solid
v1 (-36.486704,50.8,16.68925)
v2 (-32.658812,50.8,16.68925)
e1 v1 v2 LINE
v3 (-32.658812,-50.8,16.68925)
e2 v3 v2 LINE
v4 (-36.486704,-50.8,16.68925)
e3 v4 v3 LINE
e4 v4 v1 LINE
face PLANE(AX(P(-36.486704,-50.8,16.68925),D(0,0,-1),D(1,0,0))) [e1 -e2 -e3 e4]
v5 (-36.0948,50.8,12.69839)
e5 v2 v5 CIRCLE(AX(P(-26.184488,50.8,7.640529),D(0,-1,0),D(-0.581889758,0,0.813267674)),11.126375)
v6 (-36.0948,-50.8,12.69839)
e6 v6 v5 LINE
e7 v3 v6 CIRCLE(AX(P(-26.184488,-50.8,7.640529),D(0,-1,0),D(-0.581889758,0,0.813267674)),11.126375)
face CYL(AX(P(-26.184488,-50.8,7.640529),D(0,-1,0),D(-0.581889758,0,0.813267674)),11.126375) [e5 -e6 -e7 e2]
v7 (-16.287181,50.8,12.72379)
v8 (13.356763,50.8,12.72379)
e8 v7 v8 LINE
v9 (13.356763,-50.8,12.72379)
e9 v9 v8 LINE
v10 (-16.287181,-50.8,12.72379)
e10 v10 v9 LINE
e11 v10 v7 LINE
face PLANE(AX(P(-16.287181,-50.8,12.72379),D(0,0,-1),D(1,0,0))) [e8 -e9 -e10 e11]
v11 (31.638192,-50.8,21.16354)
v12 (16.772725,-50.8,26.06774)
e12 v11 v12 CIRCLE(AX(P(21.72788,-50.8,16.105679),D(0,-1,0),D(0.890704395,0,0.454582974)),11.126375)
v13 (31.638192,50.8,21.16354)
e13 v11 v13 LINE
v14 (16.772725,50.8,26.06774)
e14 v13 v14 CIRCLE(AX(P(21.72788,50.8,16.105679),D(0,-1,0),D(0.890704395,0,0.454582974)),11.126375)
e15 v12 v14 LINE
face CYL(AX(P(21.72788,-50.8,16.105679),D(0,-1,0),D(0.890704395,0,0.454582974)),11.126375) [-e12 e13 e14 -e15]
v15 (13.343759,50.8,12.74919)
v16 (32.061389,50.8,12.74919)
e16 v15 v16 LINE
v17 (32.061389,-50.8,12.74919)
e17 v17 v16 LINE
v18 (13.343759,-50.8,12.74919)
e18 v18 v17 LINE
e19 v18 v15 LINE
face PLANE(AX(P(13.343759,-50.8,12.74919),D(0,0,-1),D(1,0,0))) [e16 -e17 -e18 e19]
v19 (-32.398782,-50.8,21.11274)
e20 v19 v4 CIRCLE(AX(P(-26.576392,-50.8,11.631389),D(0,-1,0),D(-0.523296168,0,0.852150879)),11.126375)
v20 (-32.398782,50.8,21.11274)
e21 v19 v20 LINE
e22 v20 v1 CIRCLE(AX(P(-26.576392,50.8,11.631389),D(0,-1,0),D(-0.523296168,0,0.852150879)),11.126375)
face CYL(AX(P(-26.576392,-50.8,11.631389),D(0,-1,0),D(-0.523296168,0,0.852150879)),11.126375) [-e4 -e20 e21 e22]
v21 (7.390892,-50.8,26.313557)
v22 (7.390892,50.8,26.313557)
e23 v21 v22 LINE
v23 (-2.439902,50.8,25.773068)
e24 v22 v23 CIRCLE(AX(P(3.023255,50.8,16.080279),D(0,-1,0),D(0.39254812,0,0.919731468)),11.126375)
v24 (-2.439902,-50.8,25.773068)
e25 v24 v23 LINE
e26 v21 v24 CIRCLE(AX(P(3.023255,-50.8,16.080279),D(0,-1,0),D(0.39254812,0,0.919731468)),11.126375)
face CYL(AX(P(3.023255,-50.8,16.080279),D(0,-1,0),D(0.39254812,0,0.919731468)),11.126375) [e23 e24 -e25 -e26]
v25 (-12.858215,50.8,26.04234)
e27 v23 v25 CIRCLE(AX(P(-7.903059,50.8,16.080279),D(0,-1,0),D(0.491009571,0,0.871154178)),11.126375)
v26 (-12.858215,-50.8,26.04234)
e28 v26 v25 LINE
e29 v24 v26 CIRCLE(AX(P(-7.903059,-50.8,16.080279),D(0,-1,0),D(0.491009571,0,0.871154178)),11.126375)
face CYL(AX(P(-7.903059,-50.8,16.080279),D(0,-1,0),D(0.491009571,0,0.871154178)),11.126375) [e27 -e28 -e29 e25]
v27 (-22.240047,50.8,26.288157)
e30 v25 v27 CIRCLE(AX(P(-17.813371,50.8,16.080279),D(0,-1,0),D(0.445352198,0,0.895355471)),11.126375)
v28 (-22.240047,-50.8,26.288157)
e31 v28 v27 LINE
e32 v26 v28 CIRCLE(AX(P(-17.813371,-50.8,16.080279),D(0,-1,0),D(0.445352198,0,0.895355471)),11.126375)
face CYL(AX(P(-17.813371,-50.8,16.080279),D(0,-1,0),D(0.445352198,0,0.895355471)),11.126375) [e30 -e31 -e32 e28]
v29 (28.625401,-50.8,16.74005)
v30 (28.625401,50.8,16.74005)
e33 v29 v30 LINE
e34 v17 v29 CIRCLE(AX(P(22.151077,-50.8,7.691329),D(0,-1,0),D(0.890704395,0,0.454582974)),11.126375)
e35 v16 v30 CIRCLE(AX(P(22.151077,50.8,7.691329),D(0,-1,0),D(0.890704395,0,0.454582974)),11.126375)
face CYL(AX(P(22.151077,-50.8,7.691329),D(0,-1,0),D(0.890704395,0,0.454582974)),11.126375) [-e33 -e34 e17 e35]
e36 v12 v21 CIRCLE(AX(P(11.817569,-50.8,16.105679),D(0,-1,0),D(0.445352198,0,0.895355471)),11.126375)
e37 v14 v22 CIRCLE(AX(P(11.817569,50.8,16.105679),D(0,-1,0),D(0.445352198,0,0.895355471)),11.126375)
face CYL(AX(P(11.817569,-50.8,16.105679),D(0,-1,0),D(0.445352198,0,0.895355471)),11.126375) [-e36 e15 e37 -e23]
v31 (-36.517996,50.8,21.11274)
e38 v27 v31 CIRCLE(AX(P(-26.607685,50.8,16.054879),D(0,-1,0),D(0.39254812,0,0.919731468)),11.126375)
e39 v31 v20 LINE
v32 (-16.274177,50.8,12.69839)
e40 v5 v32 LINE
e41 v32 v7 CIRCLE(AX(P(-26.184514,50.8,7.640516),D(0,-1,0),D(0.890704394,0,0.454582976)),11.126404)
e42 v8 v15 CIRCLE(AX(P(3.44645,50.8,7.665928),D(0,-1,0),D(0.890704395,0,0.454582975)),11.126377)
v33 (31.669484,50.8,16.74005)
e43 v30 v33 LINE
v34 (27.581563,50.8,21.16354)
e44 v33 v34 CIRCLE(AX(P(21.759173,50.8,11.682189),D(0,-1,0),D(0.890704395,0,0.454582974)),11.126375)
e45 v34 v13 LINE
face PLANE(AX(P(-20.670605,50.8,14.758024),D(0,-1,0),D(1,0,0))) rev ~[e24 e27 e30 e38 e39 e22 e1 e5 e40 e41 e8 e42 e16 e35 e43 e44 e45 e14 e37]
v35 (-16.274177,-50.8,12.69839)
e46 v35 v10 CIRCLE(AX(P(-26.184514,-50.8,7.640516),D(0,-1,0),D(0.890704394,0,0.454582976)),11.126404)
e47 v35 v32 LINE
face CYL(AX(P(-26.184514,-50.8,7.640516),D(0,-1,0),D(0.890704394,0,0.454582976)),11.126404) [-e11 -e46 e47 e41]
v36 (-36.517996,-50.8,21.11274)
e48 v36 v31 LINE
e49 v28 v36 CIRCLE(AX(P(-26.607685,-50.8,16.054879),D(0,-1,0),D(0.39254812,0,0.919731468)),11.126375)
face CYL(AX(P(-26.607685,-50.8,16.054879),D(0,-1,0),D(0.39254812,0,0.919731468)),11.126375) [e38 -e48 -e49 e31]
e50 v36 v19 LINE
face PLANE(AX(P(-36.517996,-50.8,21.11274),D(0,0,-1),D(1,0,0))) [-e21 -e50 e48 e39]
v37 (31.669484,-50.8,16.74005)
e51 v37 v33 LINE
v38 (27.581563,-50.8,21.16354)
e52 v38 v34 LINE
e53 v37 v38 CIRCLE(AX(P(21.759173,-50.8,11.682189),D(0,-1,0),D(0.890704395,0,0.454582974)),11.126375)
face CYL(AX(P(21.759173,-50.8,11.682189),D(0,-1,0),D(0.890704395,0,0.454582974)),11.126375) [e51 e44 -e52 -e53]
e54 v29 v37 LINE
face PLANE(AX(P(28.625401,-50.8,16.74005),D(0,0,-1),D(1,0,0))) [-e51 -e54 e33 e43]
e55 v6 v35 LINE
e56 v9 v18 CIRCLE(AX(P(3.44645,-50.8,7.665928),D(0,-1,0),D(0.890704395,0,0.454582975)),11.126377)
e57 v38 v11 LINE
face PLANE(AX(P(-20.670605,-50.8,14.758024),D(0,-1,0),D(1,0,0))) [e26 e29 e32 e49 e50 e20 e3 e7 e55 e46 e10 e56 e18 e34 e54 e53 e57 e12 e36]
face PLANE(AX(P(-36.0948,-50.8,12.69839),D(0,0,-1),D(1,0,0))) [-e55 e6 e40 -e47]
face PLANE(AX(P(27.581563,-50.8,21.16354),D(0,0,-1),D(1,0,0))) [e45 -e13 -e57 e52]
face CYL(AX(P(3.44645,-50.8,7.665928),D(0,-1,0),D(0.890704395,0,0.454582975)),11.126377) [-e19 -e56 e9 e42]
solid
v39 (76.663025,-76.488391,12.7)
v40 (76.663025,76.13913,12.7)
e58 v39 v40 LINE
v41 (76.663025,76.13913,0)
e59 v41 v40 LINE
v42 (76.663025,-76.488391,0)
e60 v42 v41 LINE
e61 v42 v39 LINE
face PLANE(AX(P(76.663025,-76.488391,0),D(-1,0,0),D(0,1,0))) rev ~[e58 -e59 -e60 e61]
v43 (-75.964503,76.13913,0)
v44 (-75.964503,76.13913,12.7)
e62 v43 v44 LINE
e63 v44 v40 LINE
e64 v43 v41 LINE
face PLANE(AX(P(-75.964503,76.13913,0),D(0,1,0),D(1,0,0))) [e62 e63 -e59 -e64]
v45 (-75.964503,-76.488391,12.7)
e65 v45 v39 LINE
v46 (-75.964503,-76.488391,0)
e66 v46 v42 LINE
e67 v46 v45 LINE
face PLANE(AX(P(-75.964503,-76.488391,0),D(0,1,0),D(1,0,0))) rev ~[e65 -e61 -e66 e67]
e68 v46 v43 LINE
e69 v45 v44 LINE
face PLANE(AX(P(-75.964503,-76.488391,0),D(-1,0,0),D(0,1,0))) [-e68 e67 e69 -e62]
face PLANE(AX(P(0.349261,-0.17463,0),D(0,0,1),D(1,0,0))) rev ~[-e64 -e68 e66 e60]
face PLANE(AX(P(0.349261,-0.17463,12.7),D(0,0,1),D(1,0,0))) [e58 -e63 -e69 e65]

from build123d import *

# Parameters (mm, degrees)
F0_W     = 152.6275277138
F0_H     = 152.6275202632
F1_DEPTH = 12.7
F4_DEPTH = 101.6


with BuildPart() as f1:
    # F0 (on Top) → F1 (new body)
    with BuildSketch(Plane.XY):
        with Locations((0.3492608666, -0.1746304333)):
            Rectangle(F0_W, F0_H)
    extrude(amount=F1_DEPTH)


with BuildPart() as f4:
    # F3 (on offset) → F4 (new body)
    with BuildSketch(Plane.XZ.offset(50.8)):
        with BuildLine():
            ThreePointArc((-23.899851243, 16.6892502457), (-25.8361923758, 14.9089254969), (-27.3004854098, 12.7237895504))
            Line((-27.3004854098, 12.7237895504), (-17.3901738599, 12.7237895504))
            ThreePointArc((-17.3901738599, 12.7237895504), (-15.911695575, 14.925434135), (-13.9541862477, 16.7146502063))
            Line((-13.9541862477, 16.7146502063), (-16.6790850963, 16.7146502063))
            ThreePointArc((-16.6790850963, 16.7146502063), (-16.6725748067, 16.7019543949), (-16.6660808027, 16.6892502457))
            Line((-16.6660808027, 16.6892502457), (-19.7101641502, 16.6892502457))
            Line((-19.7101641502, 16.6892502457), (-23.899851243, 16.6892502457))
        make_face()
        with BuildLine():
            Line((-17.3901738599, 12.7237895504), (-27.3004854098, 12.7237895504))
            ThreePointArc((-27.3004854098, 12.7237895504), (-25.8361923758, 14.9089254969), (-23.899851243, 16.6892502457))
            Line((-23.899851243, 16.6892502457), (-32.6588120256, 16.6892502457))
            ThreePointArc((-32.6588120256, 16.6892502457), (-34.6163213529, 14.9000341745), (-36.0947996378, 12.6983895898))
            Line((-36.0947996378, 12.6983895898), (-16.274176538, 12.6983895898))
            ThreePointArc((-16.274176538, 12.6983895898), (-16.280670542, 12.711093739), (-16.2871808316, 12.7237895504))
            Line((-16.2871808316, 12.7237895504), (-17.3901738599, 12.7237895504))
        make_face()
        with BuildLine():
            ThreePointArc((-13.9541862477, 16.7146502063), (-15.911695575, 14.925434135), (-17.3901738599, 12.7237895504))
            Line((-17.3901738599, 12.7237895504), (-16.2871808316, 12.7237895504))
            Line((-16.2871808316, 12.7237895504), (-7.47986231, 12.7237895504))
            Line((-7.47986231, 12.7237895504), (-6.4638601616, 12.7237895504))
            ThreePointArc((-6.4638601616, 12.7237895504), (-4.9853818767, 14.925434135), (-3.0278725494, 16.7146502063))
            Line((-3.0278725494, 16.7146502063), (-6.8557644263, 16.7146502063))
            Line((-6.8557644263, 16.7146502063), (-7.8717665747, 16.7146502063))
            Line((-7.8717665747, 16.7146502063), (-13.9541862477, 16.7146502063))
        make_face()
        with BuildLine():
            ThreePointArc((-23.8644977976, 16.7146502063), (-23.8821869424, 16.701967516), (-23.899851243, 16.6892502457))
            Line((-23.899851243, 16.6892502457), (-19.7101641502, 16.6892502457))
            ThreePointArc((-19.7101641502, 16.6892502457), (-19.7279755385, 16.7019677558), (-19.7458119078, 16.7146502063))
            Line((-19.7458119078, 16.7146502063), (-23.8644977976, 16.7146502063))
        make_face()
        with BuildLine():
            Line((-32.6588120256, 16.6892502457), (-23.899851243, 16.6892502457))
            ThreePointArc((-23.899851243, 16.6892502457), (-23.8821869424, 16.701967516), (-23.8644977976, 16.7146502063))
            Line((-23.8644977976, 16.7146502063), (-27.6923896745, 16.7146502063))
            ThreePointArc((-27.6923896745, 16.7146502063), (-25.9698422833, 19.1904969058), (-23.6456289265, 21.1127400398))
            Line((-23.6456289265, 21.1127400398), (-32.3987820079, 21.1127400398))
            ThreePointArc((-32.3987820079, 21.1127400398), (-34.7477623291, 19.1828756115), (-36.4867039025, 16.6892502457))
            Line((-36.4867039025, 16.6892502457), (-32.6588120256, 16.6892502457))
        make_face()
        with BuildLine():
            Line((-16.6790850963, 16.7146502063), (-13.9541862477, 16.7146502063))
            Line((-13.9541862477, 16.7146502063), (-7.8717665747, 16.7146502063))
            Line((-7.8717665747, 16.7146502063), (-6.8557644263, 16.7146502063))
            ThreePointArc((-6.8557644263, 16.7146502063), (-5.1168228529, 19.2082755721), (-2.7678425317, 21.1381400004))
            Line((-2.7678425317, 21.1381400004), (-6.8870568648, 21.1381400004))
            Line((-6.8870568648, 21.1381400004), (-7.9030590132, 21.1381400004))
            Line((-7.9030590132, 21.1381400004), (-13.69415623, 21.1381400004))
            ThreePointArc((-13.69415623, 21.1381400004), (-16.0431365512, 19.2082755721), (-17.7820781246, 16.7146502063))
            Line((-17.7820781246, 16.7146502063), (-16.6790850963, 16.7146502063))
        make_face()
        with BuildLine():
            ThreePointArc((-19.7458119078, 16.7146502063), (-19.7279755385, 16.7019677558), (-19.7101641502, 16.6892502457))
            Line((-19.7101641502, 16.6892502457), (-16.6660808027, 16.6892502457))
            ThreePointArc((-16.6660808027, 16.6892502457), (-16.6725748067, 16.7019543949), (-16.6790850963, 16.7146502063))
            Line((-16.6790850963, 16.7146502063), (-17.7820781246, 16.7146502063))
            Line((-17.7820781246, 16.7146502063), (-19.7458119078, 16.7146502063))
        make_face()
        with BuildLine():
            Line((-27.6923896745, 16.7146502063), (-23.8644977976, 16.7146502063))
            Line((-23.8644977976, 16.7146502063), (-19.7458119078, 16.7146502063))
            Line((-19.7458119078, 16.7146502063), (-17.7820781246, 16.7146502063))
            ThreePointArc((-17.7820781246, 16.7146502063), (-16.0431365512, 19.2082755721), (-13.69415623, 21.1381400004))
            Line((-13.69415623, 21.1381400004), (-16.7103775348, 21.1381400004))
            ThreePointArc((-16.7103775348, 21.1381400004), (-16.7038672452, 21.1254441891), (-16.6973732412, 21.1127400398))
            Line((-16.6973732412, 21.1127400398), (-20.7540026972, 21.1127400398))
            Line((-20.7540026972, 21.1127400398), (-23.6456289265, 21.1127400398))
            ThreePointArc((-23.6456289265, 21.1127400398), (-25.9698422833, 19.1904969058), (-27.6923896745, 16.7146502063))
        make_face()
        with BuildLine():
            ThreePointArc((-3.0278725494, 16.7146502063), (-4.9853818767, 14.925434135), (-6.4638601616, 12.7237895504))
            Line((-6.4638601616, 12.7237895504), (2.4304492399, 12.7237895504))
            Line((2.4304492399, 12.7237895504), (13.3567629382, 12.7237895504))
            ThreePointArc((13.3567629382, 12.7237895504), (13.3502689342, 12.7364936996), (13.3437586446, 12.7491895109))
            Line((13.3437586446, 12.7491895109), (12.2407656163, 12.7491895109))
            Line((12.2407656163, 12.7491895109), (2.3304540664, 12.7491895109))
            ThreePointArc((2.3304540664, 12.7491895109), (3.7947471004, 14.9343254574), (5.7310882332, 16.7146502063))
            Line((5.7310882332, 16.7146502063), (2.0385449752, 16.7146502063))
            Line((2.0385449752, 16.7146502063), (-3.0278725494, 16.7146502063))
        make_face()
        with BuildLine():
            ThreePointArc((-2.7678425317, 21.1381400004), (-5.1168228529, 19.2082755721), (-6.8557644263, 16.7146502063))
            Line((-6.8557644263, 16.7146502063), (-3.0278725494, 16.7146502063))
            Line((-3.0278725494, 16.7146502063), (2.0385449752, 16.7146502063))
            ThreePointArc((2.0385449752, 16.7146502063), (2.0320509712, 16.7273543555), (2.0255406816, 16.7400501668))
            Line((2.0255406816, 16.7400501668), (1.9385498017, 16.7400501668))
            ThreePointArc((1.9385498017, 16.7400501668), (1.9601396942, 16.7821320004), (1.9819082764, 16.8241216778))
            ThreePointArc((1.9819082764, 16.8241216778), (3.6931960459, 19.2506339908), (5.9853105497, 21.1381400004))
            Line((5.9853105497, 21.1381400004), (2.0072525367, 21.1381400004))
            Line((2.0072525367, 21.1381400004), (-2.7678425317, 21.1381400004))
        make_face()
        with BuildLine():
            Line((-36.517996341, 21.1127400398), (-32.3987820079, 21.1127400398))
            Line((-32.3987820079, 21.1127400398), (-23.6456289265, 21.1127400398))
            ThreePointArc((-23.6456289265, 21.1127400398), (-23.6250621552, 21.1254623865), (-23.6044677799, 21.1381400004))
            Line((-23.6044677799, 21.1381400004), (-27.723682113, 21.1381400004))
            ThreePointArc((-27.723682113, 21.1381400004), (-25.4303236651, 24.190658722), (-22.2400470078, 26.2881568427))
            ThreePointArc((-22.2400470078, 26.2881568427), (-30.3993259782, 26.515265819), (-36.517996341, 21.1127400398))
        make_face()
        with BuildLine():
            ThreePointArc((-23.6044677799, 21.1381400004), (-23.6250621552, 21.1254623865), (-23.6456289265, 21.1127400398))
            Line((-23.6456289265, 21.1127400398), (-20.7540026972, 21.1127400398))
            ThreePointArc((-20.7540026972, 21.1127400398), (-20.7747717042, 21.1254627675), (-20.7955685121, 21.1381400004))
            Line((-20.7955685121, 21.1381400004), (-23.6044677799, 21.1381400004))
        make_face()
        with BuildLine():
            Line((-16.7103775348, 21.1381400004), (-13.69415623, 21.1381400004))
            Line((-13.69415623, 21.1381400004), (-7.9030590132, 21.1381400004))
            Line((-7.9030590132, 21.1381400004), (-6.8870568648, 21.1381400004))
            ThreePointArc((-6.8870568648, 21.1381400004), (-5.0052271885, 23.7835064069), (-2.439902164, 25.7730676333))
            ThreePointArc((-2.439902164, 25.7730676333), (-7.6155816808, 27.2029401673), (-12.8582147881, 26.0423403114))
            ThreePointArc((-12.8582147881, 26.0423403114), (-15.7298287727, 23.9883703542), (-17.8133705631, 21.1381400004))
            Line((-17.8133705631, 21.1381400004), (-16.7103775348, 21.1381400004))
        make_face()
        with BuildLine():
            Line((-6.8870568648, 21.1381400004), (-2.7678425317, 21.1381400004))
            Line((-2.7678425317, 21.1381400004), (2.0072525367, 21.1381400004))
            ThreePointArc((2.0072525367, 21.1381400004), (2.0007585327, 21.1508441496), (1.9942482431, 21.163539961))
            Line((1.9942482431, 21.163539961), (1.9072573632, 21.163539961))
            ThreePointArc((1.9072573632, 21.163539961), (1.9288472557, 21.2056217946), (1.9506158379, 21.247611472))
            ThreePointArc((1.9506158379, 21.247611472), (4.2351608696, 24.2483641482), (7.3908924684, 26.3135568032))
            ThreePointArc((7.3908924684, 26.3135568032), (2.4124579582, 27.1898767431), (-2.439902164, 25.7730676333))
            ThreePointArc((-2.439902164, 25.7730676333), (-5.0052271885, 23.7835064069), (-6.8870568648, 21.1381400004))
        make_face()
        with BuildLine():
            ThreePointArc((-20.7955685121, 21.1381400004), (-20.7747717042, 21.1254627675), (-20.7540026972, 21.1127400398))
            Line((-20.7540026972, 21.1127400398), (-16.6973732412, 21.1127400398))
            ThreePointArc((-16.6973732412, 21.1127400398), (-16.7038672452, 21.1254441891), (-16.7103775348, 21.1381400004))
            Line((-16.7103775348, 21.1381400004), (-17.8133705631, 21.1381400004))
            Line((-17.8133705631, 21.1381400004), (-20.7955685121, 21.1381400004))
        make_face()
        with BuildLine():
            Line((-27.723682113, 21.1381400004), (-23.6044677799, 21.1381400004))
            Line((-23.6044677799, 21.1381400004), (-20.7955685121, 21.1381400004))
            Line((-20.7955685121, 21.1381400004), (-17.8133705631, 21.1381400004))
            ThreePointArc((-17.8133705631, 21.1381400004), (-15.7298287727, 23.9883703542), (-12.8582147881, 26.0423403114))
            ThreePointArc((-12.8582147881, 26.0423403114), (-17.5219446851, 27.2028374115), (-22.2400470078, 26.2881568427))
            ThreePointArc((-22.2400470078, 26.2881568427), (-25.4303236651, 24.190658722), (-27.723682113, 21.1381400004))
        make_face()
        with BuildLine():
            ThreePointArc((2.0255406816, 16.7400501668), (2.0320509712, 16.7273543555), (2.0385449752, 16.7146502063))
            Line((2.0385449752, 16.7146502063), (5.7310882332, 16.7146502063))
            ThreePointArc((5.7310882332, 16.7146502063), (5.7487525338, 16.7273674766), (5.7664416786, 16.7400501668))
            Line((5.7664416786, 16.7400501668), (2.0255406816, 16.7400501668))
        make_face()
        with BuildLine():
            ThreePointArc((1.9942482431, 21.163539961), (2.0007585327, 21.1508441496), (2.0072525367, 21.1381400004))
            Line((2.0072525367, 21.1381400004), (5.9853105497, 21.1381400004))
            ThreePointArc((5.9853105497, 21.1381400004), (6.005877321, 21.1508623471), (6.0264716963, 21.163539961))
            Line((6.0264716963, 21.163539961), (1.9942482431, 21.163539961))
        make_face()
        with BuildLine():
            Line((12.2407656163, 12.7491895109), (13.3437586446, 12.7491895109))
            Line((13.3437586446, 12.7491895109), (22.1510771662, 12.7491895109))
            Line((22.1510771662, 12.7491895109), (32.0613887161, 12.7491895109))
            ThreePointArc((32.0613887161, 12.7491895109), (30.5829104312, 14.9508340956), (28.6254011039, 16.7400501668))
            Line((28.6254011039, 16.7400501668), (21.7591729015, 16.7400501668))
            Line((21.7591729015, 16.7400501668), (15.6767532285, 16.7400501668))
            ThreePointArc((15.6767532285, 16.7400501668), (13.7192439012, 14.9508340956), (12.2407656163, 12.7491895109))
        make_face()
        with BuildLine():
            Line((1.9385498017, 16.7400501668), (2.0255406816, 16.7400501668))
            ThreePointArc((2.0255406816, 16.7400501668), (2.0038139428, 16.7821323533), (1.9819082764, 16.8241216778))
            ThreePointArc((1.9819082764, 16.8241216778), (1.9601396942, 16.7821320004), (1.9385498017, 16.7400501668))
        make_face()
        with BuildLine():
            ThreePointArc((1.9819082764, 16.8241216778), (2.0038139428, 16.7821323533), (2.0255406816, 16.7400501668))
            Line((2.0255406816, 16.7400501668), (5.7664416786, 16.7400501668))
            Line((5.7664416786, 16.7400501668), (9.8851275684, 16.7400501668))
            Line((9.8851275684, 16.7400501668), (11.8488613516, 16.7400501668))
            ThreePointArc((11.8488613516, 16.7400501668), (13.587802925, 19.2336755327), (15.9367832462, 21.163539961))
            Line((15.9367832462, 21.163539961), (12.9205619414, 21.163539961))
            ThreePointArc((12.9205619414, 21.163539961), (12.927072231, 21.1508441496), (12.933566235, 21.1381400004))
            Line((12.933566235, 21.1381400004), (8.876936779, 21.1381400004))
            Line((8.876936779, 21.1381400004), (5.9853105497, 21.1381400004))
            ThreePointArc((5.9853105497, 21.1381400004), (3.6931960459, 19.2506339908), (1.9819082764, 16.8241216778))
        make_face()
        with BuildLine():
            ThreePointArc((5.7664416786, 16.7400501668), (5.7487525338, 16.7273674766), (5.7310882332, 16.7146502063))
            Line((5.7310882332, 16.7146502063), (9.920775326, 16.7146502063))
            ThreePointArc((9.920775326, 16.7146502063), (9.9029639377, 16.7273677164), (9.8851275684, 16.7400501668))
            Line((9.8851275684, 16.7400501668), (5.7664416786, 16.7400501668))
        make_face()
        with BuildLine():
            Line((9.920775326, 16.7146502063), (5.7310882332, 16.7146502063))
            ThreePointArc((5.7310882332, 16.7146502063), (3.7947471004, 14.9343254574), (2.3304540664, 12.7491895109))
            Line((2.3304540664, 12.7491895109), (12.2407656163, 12.7491895109))
            ThreePointArc((12.2407656163, 12.7491895109), (13.7192439012, 14.9508340956), (15.6767532285, 16.7400501668))
            Line((15.6767532285, 16.7400501668), (12.9518543799, 16.7400501668))
            ThreePointArc((12.9518543799, 16.7400501668), (12.9583646695, 16.7273543555), (12.9648586735, 16.7146502063))
            Line((12.9648586735, 16.7146502063), (9.920775326, 16.7146502063))
        make_face()
        with BuildLine():
            Line((1.9072573632, 21.163539961), (1.9942482431, 21.163539961))
            ThreePointArc((1.9942482431, 21.163539961), (1.9725215042, 21.2056221474), (1.9506158379, 21.247611472))
            ThreePointArc((1.9506158379, 21.247611472), (1.9288472557, 21.2056217946), (1.9072573632, 21.163539961))
        make_face()
        with BuildLine():
            ThreePointArc((1.9506158379, 21.247611472), (1.9725215042, 21.2056221474), (1.9942482431, 21.163539961))
            Line((1.9942482431, 21.163539961), (6.0264716963, 21.163539961))
            Line((6.0264716963, 21.163539961), (8.8353709641, 21.163539961))
            Line((8.8353709641, 21.163539961), (11.8175689131, 21.163539961))
            ThreePointArc((11.8175689131, 21.163539961), (13.9011107034, 24.0137703148), (16.7727246881, 26.067740272))
            ThreePointArc((16.7727246881, 26.067740272), (12.1089947911, 27.2282373721), (7.3908924684, 26.3135568032))
            ThreePointArc((7.3908924684, 26.3135568032), (4.2351608696, 24.2483641482), (1.9506158379, 21.247611472))
        make_face()
        with BuildLine():
            ThreePointArc((6.0264716963, 21.163539961), (6.005877321, 21.1508623471), (5.9853105497, 21.1381400004))
            Line((5.9853105497, 21.1381400004), (8.876936779, 21.1381400004))
            ThreePointArc((8.876936779, 21.1381400004), (8.856167772, 21.150862728), (8.8353709641, 21.163539961))
            Line((8.8353709641, 21.163539961), (6.0264716963, 21.163539961))
        make_face()
        with BuildLine():
            ThreePointArc((9.8851275684, 16.7400501668), (9.9029639377, 16.7273677164), (9.920775326, 16.7146502063))
            Line((9.920775326, 16.7146502063), (12.9648586735, 16.7146502063))
            ThreePointArc((12.9648586735, 16.7146502063), (12.9583646695, 16.7273543555), (12.9518543799, 16.7400501668))
            Line((12.9518543799, 16.7400501668), (11.8488613516, 16.7400501668))
            Line((11.8488613516, 16.7400501668), (9.8851275684, 16.7400501668))
        make_face()
        with BuildLine():
            ThreePointArc((8.8353709641, 21.163539961), (8.856167772, 21.150862728), (8.876936779, 21.1381400004))
            Line((8.876936779, 21.1381400004), (12.933566235, 21.1381400004))
            ThreePointArc((12.933566235, 21.1381400004), (12.927072231, 21.1508441496), (12.9205619414, 21.163539961))
            Line((12.9205619414, 21.163539961), (11.8175689131, 21.163539961))
            Line((11.8175689131, 21.163539961), (8.8353709641, 21.163539961))
        make_face()
        with BuildLine():
            Line((12.9518543799, 16.7400501668), (15.6767532285, 16.7400501668))
            Line((15.6767532285, 16.7400501668), (21.7591729015, 16.7400501668))
            Line((21.7591729015, 16.7400501668), (28.6254011039, 16.7400501668))
            Line((28.6254011039, 16.7400501668), (31.6694844514, 16.7400501668))
            ThreePointArc((31.6694844514, 16.7400501668), (29.930542878, 19.2336755327), (27.5815625569, 21.163539961))
            Line((27.5815625569, 21.163539961), (21.727880463, 21.163539961))
            Line((21.727880463, 21.163539961), (15.9367832462, 21.163539961))
            ThreePointArc((15.9367832462, 21.163539961), (13.587802925, 19.2336755327), (11.8488613516, 16.7400501668))
            Line((11.8488613516, 16.7400501668), (12.9518543799, 16.7400501668))
        make_face()
        with BuildLine():
            ThreePointArc((31.6381920129, 21.163539961), (25.2137357901, 26.6719009504), (16.7727246881, 26.067740272))
            ThreePointArc((16.7727246881, 26.067740272), (13.9011107034, 24.0137703148), (11.8175689131, 21.163539961))
            Line((11.8175689131, 21.163539961), (12.9205619414, 21.163539961))
            Line((12.9205619414, 21.163539961), (15.9367832462, 21.163539961))
            Line((15.9367832462, 21.163539961), (21.727880463, 21.163539961))
            Line((21.727880463, 21.163539961), (27.5815625569, 21.163539961))
            Line((27.5815625569, 21.163539961), (31.6381920129, 21.163539961))
        make_face()
    extrude(amount=-F4_DEPTH)


solid = Compound([f1.part, f4.part])
